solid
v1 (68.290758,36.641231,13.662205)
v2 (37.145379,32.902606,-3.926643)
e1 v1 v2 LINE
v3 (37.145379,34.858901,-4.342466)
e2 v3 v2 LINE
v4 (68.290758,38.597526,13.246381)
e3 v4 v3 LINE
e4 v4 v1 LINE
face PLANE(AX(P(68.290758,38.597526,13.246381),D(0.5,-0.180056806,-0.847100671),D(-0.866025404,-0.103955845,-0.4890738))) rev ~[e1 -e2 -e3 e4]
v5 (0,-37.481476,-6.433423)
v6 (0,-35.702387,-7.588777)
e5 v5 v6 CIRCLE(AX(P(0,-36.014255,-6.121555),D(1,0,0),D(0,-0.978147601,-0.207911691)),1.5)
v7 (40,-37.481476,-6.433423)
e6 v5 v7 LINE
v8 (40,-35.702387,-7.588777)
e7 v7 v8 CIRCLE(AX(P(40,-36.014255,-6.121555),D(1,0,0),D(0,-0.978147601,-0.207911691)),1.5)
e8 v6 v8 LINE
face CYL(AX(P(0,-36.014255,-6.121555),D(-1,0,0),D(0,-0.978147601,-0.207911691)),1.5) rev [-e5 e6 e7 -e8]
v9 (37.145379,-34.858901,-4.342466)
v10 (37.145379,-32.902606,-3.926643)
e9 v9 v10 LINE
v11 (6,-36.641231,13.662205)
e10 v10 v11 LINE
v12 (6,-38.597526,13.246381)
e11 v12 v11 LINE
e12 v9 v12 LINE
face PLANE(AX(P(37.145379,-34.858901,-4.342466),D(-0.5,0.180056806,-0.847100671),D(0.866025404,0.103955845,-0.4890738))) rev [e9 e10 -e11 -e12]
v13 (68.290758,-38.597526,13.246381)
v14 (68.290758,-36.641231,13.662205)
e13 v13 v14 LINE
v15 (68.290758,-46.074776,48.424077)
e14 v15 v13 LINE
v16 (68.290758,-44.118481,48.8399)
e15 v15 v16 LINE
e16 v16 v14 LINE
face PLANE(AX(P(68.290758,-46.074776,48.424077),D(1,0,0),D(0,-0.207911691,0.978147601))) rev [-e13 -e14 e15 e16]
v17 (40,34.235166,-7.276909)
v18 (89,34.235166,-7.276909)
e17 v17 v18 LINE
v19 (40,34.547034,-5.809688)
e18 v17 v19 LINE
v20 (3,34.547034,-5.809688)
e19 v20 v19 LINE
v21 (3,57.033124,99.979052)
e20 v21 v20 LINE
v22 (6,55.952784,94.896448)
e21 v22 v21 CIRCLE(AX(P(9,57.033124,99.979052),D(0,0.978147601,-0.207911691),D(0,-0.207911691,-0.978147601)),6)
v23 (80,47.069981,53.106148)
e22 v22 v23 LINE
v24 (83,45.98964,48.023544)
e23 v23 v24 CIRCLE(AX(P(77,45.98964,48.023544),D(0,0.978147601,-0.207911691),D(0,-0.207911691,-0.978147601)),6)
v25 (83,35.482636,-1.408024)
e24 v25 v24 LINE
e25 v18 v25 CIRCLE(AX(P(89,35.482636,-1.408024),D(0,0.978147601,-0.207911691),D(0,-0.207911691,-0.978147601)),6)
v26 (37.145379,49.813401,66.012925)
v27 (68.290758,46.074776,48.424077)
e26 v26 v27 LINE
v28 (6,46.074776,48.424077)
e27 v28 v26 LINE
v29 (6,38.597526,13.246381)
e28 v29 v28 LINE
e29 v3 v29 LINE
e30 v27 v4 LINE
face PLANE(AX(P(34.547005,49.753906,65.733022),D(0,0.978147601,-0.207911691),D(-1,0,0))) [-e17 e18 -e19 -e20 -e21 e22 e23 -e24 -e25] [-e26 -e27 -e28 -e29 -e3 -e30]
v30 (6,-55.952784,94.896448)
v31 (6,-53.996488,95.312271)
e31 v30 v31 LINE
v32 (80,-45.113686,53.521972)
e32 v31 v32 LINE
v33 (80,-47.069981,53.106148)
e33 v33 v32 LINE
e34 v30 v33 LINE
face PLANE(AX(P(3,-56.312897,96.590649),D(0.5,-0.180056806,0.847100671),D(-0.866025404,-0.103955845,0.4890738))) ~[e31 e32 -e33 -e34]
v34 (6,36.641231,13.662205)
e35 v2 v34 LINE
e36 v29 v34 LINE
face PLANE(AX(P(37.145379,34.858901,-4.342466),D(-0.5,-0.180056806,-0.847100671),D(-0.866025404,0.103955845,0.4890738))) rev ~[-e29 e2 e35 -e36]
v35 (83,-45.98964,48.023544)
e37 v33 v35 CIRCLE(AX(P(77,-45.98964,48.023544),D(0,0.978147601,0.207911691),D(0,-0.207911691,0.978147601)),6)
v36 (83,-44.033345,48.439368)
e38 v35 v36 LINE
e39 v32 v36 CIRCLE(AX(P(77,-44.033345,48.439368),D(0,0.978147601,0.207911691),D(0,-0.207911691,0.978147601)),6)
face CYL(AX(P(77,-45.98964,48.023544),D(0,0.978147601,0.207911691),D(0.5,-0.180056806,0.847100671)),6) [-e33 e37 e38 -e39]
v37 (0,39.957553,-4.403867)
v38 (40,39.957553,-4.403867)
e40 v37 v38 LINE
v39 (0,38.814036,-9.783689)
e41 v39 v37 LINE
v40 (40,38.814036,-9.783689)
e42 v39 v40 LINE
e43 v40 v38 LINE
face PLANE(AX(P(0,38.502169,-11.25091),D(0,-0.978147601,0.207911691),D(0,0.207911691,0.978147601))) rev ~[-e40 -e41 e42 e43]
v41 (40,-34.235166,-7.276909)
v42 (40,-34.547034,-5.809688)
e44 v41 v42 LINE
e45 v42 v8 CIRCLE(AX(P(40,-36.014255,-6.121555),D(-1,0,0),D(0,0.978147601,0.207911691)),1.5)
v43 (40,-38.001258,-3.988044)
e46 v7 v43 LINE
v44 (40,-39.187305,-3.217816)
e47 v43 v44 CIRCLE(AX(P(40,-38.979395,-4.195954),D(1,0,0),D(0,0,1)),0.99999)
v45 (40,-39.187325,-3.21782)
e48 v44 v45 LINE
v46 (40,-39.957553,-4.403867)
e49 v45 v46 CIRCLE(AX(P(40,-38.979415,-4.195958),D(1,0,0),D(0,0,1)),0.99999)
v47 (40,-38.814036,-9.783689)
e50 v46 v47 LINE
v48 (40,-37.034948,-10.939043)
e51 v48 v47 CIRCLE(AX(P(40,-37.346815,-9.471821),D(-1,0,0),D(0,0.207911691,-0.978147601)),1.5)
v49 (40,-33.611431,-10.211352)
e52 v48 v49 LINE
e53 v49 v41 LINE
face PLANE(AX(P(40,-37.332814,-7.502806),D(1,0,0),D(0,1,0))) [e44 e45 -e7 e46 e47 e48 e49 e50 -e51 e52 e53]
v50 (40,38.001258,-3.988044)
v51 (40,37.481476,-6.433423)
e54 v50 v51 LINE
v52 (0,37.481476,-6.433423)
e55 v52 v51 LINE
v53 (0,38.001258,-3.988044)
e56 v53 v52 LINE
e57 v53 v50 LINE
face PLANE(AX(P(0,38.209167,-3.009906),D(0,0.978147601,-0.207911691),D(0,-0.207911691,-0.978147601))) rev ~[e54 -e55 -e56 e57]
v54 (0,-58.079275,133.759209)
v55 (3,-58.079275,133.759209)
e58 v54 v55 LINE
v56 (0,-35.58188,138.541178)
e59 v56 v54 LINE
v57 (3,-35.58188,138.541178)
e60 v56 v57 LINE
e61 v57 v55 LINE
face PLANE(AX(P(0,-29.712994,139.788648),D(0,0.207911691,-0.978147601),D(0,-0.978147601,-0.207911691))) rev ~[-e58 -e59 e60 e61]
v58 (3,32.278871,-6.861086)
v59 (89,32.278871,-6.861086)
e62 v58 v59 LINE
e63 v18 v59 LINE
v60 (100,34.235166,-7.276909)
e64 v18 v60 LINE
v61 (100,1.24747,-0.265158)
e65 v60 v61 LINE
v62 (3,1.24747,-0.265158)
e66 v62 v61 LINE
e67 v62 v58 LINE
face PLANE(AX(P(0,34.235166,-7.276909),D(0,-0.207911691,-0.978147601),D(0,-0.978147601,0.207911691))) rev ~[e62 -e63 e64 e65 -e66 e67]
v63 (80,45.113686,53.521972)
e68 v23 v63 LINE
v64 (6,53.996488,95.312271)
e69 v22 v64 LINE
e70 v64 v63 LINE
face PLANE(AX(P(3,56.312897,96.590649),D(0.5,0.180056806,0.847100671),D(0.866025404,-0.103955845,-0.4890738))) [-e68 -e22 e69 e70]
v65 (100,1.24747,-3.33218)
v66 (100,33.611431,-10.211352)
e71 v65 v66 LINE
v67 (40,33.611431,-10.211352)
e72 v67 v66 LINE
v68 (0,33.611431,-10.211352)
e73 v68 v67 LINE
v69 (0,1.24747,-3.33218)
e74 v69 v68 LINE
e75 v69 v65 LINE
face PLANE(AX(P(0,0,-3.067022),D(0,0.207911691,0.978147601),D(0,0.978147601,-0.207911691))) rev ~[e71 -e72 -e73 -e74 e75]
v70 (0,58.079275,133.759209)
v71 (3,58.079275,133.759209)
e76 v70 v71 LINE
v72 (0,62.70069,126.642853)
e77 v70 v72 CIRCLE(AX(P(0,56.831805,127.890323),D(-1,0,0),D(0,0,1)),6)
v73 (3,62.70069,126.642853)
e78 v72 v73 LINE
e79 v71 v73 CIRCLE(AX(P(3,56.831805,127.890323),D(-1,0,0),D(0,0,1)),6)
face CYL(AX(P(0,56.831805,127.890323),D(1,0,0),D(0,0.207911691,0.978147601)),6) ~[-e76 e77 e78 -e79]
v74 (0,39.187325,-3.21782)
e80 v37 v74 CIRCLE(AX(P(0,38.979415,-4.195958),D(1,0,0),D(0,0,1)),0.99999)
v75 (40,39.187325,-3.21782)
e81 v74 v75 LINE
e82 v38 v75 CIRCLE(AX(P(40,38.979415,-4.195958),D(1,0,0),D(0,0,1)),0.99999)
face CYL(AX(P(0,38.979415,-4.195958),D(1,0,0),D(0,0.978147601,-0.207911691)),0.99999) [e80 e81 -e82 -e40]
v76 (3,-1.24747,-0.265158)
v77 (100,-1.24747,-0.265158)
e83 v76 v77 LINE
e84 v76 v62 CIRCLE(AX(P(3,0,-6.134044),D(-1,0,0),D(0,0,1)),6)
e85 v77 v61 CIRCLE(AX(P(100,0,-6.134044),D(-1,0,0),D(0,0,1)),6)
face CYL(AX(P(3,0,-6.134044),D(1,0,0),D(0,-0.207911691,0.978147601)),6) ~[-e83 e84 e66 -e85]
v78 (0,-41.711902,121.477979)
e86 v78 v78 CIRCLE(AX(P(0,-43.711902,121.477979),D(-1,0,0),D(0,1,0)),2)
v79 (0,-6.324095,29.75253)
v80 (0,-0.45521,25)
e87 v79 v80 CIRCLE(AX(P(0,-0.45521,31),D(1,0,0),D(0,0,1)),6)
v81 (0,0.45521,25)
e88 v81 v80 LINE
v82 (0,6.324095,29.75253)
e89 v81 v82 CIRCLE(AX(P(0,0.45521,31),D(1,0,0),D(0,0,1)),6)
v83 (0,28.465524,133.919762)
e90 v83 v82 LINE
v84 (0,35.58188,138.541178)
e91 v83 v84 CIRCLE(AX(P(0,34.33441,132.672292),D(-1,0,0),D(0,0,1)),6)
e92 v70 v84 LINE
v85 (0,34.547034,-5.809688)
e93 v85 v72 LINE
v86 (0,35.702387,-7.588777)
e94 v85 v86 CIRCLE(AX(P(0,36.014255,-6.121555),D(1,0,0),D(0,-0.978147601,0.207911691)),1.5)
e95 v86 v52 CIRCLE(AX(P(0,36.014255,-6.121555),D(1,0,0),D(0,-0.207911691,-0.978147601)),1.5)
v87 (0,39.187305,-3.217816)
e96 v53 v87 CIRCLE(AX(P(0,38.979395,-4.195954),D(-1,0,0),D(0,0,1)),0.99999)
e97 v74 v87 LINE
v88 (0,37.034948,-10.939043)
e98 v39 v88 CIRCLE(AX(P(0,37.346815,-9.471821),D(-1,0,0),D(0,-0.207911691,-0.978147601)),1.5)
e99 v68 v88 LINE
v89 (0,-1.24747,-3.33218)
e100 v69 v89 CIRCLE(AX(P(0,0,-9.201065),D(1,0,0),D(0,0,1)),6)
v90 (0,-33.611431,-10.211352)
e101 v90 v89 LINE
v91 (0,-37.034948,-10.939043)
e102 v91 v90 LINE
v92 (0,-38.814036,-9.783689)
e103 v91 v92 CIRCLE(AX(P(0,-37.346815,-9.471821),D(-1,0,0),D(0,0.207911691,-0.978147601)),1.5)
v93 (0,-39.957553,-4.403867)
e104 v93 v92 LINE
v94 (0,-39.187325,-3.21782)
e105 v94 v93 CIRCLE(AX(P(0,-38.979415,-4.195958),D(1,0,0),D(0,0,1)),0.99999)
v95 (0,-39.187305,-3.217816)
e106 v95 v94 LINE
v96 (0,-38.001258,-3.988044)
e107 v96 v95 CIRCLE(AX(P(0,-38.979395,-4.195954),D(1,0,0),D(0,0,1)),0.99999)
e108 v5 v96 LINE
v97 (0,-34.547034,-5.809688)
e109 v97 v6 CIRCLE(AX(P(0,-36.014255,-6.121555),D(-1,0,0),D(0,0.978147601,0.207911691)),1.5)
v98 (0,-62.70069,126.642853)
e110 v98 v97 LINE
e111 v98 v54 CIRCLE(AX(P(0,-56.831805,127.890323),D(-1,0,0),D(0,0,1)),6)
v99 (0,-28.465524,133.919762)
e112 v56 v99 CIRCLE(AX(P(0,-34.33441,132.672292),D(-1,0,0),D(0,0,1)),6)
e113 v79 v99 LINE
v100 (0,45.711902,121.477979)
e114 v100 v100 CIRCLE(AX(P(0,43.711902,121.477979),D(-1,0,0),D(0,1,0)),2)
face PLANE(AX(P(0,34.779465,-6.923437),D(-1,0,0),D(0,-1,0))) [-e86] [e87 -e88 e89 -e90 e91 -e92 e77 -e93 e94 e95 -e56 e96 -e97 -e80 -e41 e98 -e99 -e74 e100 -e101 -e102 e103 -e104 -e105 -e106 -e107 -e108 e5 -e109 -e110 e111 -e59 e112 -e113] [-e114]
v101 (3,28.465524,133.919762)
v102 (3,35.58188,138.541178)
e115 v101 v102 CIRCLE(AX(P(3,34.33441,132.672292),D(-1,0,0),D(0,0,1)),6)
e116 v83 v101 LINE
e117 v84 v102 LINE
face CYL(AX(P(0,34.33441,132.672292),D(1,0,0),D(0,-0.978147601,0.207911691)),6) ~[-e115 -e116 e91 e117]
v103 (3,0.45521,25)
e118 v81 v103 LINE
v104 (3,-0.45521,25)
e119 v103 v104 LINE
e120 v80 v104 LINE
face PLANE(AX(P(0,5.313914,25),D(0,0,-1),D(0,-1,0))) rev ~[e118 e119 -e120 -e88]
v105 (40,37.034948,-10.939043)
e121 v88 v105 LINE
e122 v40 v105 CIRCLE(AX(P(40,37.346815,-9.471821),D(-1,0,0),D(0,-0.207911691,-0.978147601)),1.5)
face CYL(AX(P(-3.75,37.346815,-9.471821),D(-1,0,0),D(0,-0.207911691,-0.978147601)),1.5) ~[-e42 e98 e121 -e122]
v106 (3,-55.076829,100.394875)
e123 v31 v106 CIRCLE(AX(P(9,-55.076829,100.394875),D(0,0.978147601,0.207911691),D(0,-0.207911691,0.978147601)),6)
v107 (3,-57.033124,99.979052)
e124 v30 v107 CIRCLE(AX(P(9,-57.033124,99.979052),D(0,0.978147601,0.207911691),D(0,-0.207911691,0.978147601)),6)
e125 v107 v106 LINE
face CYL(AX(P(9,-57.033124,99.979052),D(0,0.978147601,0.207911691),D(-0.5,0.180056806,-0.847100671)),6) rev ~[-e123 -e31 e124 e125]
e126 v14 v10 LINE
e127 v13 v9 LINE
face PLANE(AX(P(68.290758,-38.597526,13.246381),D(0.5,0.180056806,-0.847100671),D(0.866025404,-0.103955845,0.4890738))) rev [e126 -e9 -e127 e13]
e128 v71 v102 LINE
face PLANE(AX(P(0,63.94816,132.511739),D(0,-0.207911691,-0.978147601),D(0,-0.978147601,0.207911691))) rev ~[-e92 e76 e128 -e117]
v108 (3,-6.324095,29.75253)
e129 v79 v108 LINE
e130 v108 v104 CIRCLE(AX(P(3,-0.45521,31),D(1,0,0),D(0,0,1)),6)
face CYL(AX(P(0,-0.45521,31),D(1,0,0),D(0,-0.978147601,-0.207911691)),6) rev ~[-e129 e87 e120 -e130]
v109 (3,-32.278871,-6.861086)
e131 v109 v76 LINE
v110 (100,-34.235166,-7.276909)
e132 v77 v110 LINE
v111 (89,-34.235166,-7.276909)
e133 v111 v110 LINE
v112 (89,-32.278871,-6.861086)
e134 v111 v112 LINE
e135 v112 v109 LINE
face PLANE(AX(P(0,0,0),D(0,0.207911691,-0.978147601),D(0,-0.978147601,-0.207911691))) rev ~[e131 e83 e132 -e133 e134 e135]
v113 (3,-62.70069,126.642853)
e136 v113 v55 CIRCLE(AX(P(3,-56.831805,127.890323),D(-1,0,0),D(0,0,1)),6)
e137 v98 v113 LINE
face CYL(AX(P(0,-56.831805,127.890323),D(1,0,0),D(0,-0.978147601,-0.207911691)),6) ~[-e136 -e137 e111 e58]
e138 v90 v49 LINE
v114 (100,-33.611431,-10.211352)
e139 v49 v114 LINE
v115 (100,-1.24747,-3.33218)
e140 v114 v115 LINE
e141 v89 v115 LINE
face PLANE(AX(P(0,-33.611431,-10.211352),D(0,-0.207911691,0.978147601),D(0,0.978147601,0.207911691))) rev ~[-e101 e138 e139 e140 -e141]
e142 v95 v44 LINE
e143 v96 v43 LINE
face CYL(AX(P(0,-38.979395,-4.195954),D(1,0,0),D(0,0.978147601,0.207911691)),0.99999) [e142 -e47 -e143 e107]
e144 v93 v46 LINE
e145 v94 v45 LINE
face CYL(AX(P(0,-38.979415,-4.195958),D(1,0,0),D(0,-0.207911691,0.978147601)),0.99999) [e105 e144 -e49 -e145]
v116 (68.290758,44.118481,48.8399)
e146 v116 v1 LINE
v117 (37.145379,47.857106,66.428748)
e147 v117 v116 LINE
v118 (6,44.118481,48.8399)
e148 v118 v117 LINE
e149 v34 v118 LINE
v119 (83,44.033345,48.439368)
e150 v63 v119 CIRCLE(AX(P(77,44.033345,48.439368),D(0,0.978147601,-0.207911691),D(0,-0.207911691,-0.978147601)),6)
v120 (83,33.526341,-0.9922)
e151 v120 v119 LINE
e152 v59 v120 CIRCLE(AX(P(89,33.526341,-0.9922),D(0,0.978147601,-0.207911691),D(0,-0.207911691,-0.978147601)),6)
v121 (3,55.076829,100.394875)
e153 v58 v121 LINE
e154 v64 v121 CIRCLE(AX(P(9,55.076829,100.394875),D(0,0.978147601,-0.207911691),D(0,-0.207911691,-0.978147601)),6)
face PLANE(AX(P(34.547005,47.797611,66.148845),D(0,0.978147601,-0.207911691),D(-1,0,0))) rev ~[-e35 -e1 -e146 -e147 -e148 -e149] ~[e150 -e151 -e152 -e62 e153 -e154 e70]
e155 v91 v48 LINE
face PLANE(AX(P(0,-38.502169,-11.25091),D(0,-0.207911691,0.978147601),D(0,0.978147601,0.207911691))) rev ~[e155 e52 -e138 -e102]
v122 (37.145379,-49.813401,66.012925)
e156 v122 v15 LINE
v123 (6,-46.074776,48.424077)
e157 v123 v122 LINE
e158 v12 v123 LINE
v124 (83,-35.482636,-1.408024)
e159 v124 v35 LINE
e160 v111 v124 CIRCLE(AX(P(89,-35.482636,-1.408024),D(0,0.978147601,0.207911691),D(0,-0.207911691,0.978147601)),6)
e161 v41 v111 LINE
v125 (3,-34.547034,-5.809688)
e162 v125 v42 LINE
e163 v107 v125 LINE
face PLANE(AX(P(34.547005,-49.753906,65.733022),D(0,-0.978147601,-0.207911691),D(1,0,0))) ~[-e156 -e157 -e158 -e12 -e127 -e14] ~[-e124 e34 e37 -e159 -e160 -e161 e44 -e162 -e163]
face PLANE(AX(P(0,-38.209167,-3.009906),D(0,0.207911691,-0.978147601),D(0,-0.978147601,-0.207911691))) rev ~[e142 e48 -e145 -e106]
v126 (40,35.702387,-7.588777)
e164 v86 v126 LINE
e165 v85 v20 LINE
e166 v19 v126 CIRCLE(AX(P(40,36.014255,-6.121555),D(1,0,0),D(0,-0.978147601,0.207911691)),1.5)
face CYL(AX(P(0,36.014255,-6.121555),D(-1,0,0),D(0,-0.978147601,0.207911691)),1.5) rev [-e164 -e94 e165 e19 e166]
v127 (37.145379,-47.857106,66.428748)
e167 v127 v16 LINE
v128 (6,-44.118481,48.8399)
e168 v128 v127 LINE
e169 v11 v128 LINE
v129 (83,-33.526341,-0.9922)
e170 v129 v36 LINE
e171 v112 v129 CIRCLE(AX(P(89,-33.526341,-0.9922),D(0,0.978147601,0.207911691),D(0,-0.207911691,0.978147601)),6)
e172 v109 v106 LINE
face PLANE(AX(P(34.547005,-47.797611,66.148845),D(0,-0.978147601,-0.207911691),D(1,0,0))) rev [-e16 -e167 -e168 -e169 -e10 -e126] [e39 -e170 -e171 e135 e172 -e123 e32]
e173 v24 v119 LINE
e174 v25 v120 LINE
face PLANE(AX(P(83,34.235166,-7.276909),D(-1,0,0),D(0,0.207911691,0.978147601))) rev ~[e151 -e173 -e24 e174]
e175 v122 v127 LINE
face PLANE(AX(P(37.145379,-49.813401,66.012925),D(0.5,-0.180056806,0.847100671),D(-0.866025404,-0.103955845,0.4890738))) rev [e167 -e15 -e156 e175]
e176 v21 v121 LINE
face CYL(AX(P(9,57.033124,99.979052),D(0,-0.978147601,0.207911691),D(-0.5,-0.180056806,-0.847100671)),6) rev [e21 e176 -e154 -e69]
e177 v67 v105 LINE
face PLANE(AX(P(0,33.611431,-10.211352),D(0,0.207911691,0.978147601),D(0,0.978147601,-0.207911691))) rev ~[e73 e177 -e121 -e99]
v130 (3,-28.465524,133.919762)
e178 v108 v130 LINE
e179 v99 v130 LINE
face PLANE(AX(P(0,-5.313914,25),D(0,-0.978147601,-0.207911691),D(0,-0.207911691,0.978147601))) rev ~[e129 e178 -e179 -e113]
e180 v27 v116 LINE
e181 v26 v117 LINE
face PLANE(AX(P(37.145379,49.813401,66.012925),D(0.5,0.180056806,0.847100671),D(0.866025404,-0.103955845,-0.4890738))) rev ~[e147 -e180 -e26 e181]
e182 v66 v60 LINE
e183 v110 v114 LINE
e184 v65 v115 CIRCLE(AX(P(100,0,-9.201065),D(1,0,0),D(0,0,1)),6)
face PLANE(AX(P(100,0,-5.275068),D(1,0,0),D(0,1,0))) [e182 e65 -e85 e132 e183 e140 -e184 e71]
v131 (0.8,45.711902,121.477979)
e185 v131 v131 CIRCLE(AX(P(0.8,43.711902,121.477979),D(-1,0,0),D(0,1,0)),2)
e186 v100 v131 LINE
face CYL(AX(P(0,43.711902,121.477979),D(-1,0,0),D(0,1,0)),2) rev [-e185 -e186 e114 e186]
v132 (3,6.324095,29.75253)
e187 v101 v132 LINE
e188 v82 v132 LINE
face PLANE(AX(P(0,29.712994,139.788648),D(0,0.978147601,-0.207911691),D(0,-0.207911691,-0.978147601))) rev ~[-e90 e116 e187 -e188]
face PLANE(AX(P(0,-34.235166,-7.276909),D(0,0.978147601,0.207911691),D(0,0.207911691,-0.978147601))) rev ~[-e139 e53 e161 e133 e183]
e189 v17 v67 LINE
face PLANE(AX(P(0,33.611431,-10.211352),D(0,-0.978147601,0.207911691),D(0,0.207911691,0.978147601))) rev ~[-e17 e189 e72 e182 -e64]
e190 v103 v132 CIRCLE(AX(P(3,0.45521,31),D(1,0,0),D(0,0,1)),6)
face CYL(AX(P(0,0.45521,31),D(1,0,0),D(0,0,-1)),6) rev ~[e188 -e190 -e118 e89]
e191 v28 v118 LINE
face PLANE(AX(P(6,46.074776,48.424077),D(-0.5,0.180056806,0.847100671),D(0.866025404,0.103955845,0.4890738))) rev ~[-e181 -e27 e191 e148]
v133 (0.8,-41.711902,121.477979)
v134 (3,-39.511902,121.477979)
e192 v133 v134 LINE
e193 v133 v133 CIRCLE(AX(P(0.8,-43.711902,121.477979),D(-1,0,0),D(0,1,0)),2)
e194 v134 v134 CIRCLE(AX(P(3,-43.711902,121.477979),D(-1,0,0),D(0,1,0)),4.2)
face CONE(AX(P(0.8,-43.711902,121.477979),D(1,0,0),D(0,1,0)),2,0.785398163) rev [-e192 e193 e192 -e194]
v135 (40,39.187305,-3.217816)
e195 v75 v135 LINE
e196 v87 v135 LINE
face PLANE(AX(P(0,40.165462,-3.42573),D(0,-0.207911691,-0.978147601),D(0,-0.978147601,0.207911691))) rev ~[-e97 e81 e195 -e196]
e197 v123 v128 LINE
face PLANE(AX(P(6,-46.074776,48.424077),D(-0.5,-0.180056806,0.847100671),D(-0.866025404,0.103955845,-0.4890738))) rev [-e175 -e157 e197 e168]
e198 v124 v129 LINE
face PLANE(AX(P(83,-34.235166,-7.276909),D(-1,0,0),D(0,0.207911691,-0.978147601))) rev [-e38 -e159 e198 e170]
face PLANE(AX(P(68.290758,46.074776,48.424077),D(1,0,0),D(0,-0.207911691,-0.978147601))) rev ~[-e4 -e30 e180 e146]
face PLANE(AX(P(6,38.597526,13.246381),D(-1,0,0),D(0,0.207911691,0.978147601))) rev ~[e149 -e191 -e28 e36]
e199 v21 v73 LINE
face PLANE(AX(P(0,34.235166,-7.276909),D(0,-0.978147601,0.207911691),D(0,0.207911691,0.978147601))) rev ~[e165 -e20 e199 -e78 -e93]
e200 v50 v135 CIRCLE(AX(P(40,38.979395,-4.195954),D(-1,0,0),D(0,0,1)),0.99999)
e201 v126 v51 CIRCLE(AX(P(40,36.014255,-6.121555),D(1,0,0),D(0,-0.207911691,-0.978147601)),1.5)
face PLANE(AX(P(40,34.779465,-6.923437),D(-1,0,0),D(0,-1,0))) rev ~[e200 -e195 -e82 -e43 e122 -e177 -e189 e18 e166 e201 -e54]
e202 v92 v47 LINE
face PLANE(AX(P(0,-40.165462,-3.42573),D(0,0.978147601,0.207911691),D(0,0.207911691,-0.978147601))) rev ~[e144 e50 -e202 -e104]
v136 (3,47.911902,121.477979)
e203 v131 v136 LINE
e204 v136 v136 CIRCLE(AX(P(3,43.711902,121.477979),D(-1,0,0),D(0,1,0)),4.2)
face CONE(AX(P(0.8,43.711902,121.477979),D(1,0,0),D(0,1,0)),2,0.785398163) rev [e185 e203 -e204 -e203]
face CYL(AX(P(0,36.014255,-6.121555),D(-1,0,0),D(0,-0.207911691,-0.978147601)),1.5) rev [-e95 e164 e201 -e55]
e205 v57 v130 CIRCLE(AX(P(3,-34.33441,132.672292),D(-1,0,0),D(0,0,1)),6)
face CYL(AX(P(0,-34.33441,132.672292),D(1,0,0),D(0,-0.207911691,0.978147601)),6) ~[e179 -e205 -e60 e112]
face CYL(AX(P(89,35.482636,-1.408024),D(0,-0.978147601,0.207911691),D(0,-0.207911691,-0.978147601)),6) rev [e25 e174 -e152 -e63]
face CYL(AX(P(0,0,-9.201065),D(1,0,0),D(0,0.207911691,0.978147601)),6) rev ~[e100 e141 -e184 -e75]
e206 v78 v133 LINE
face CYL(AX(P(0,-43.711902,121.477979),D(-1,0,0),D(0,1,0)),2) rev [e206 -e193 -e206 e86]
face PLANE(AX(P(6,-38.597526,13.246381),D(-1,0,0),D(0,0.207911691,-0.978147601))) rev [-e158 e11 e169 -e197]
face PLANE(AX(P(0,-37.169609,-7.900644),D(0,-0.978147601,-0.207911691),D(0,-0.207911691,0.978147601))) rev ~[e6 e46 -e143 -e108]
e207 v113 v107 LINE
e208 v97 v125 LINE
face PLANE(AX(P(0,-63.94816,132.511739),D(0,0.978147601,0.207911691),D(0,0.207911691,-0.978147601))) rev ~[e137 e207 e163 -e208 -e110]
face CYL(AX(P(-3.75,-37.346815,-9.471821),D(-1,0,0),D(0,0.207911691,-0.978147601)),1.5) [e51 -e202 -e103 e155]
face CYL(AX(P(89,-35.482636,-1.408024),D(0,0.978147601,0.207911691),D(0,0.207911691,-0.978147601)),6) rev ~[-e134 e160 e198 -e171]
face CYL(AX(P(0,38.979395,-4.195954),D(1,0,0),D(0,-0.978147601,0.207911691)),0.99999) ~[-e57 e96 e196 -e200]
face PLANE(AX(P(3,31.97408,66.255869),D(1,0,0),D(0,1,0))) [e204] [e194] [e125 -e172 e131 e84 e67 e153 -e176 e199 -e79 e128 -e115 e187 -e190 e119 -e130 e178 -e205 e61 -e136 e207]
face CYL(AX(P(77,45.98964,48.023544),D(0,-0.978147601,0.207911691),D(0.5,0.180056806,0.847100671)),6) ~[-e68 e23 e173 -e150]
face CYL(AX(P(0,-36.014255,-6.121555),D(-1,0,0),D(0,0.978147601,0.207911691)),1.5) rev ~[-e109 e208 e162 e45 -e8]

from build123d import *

# Parameters (mm, degrees)
F1_DEPTH     = 100
F0_R         = 2
F2_DEPTH     = 3
F3_DEPTH     = 40
F4_W         = 80
F4_H         = 60
F5_DEPTH     = 2
F7_DEPTH     = 25
F9_R         = 6
F10_T1_DEPTH = 40
F10_T3_DEPTH = 47.5
F11_R        = 0.99999
F12_SIZE     = 2.2


# Not quite as in the source:
# - a fillet or chamfer that OpenCascade refuses, or shapes differently, is made with other operations: its cross-section is extruded or revolved along the edge and cut away or added
# - a fillet or chamfer is up to 0.001 mm smaller than in the source, because OpenCascade refuses the exact size


with BuildPart() as f1:
    # F0 (on Right) → F1 (new body)
    with BuildSketch(Plane.YZ):
        Polygon((34.2351660257, -7.2769091786), (0, 0), (-34.2351660257, -7.2769091786), (-33.6114309532, -10.2113519808), (0, -3.0670217846), (33.6114309532, -10.2113519808), align=None)
    extrude(amount=F1_DEPTH)

    # F0 (on Right) → F2 (join)
    with BuildSketch(Plane.YZ):
        Polygon((5.3139140418, 25), (0, 0), (34.2351660257, -7.2769091786), (63.9481604091, 132.5117388406), (29.7129943835, 139.7886480192), align=None)
        with Locations((43.711902034, 121.4779794189)):
            Circle(F0_R, mode=Mode.SUBTRACT)
        Polygon((-5.3139140418, 25), (0, 0), (5.3139140418, 25), align=None)
        Polygon((-34.2351660257, -7.2769091786), (0, 0), (-5.3139140418, 25), (-29.7129943835, 139.7886480192), (-63.9481604091, 132.5117388406), align=None)
        with Locations((-43.711902034, 121.4779794189)):
            Circle(F0_R, mode=Mode.SUBTRACT)
    extrude(amount=F2_DEPTH)

    # F0 (on Right) → F3 (join)
    with BuildSketch(Plane.YZ):
        Polygon((-33.6114309532, -10.2113519808), (-34.2351660257, -7.2769091786), (-37.1696088279, -7.9006442511), (-38.209167282, -3.0099062474), (-40.1654624834, -3.425729629), (-38.5021689569, -11.2509104349), align=None)
        Polygon((37.1696088279, -7.9006442511), (34.2351660257, -7.2769091786), (33.6114309532, -10.2113519808), (38.5021689569, -11.2509104349), (40.1654624834, -3.425729629), (38.209167282, -3.0099062474), align=None)
    extrude(amount=F3_DEPTH)

    # F4 (on face) → F5 (join)
    with BuildSketch(Plane(origin=(0, 34.2351660257, -7.2769091786), x_dir=(-1, 0, 0), z_dir=(0, 0.9781476007, -0.2079116908))):
        Polygon((-3, 106.1880215352), (-83, 60), (-3, 60), align=None)
        with Locations((-43, 30)):
            Rectangle(F4_W, F4_H)
    extrude(amount=-F5_DEPTH)

    # F6 (on face) → F7 (cut)
    with BuildSketch(Plane(origin=(0, 34.2351660257, -7.2769091786), x_dir=(-1, 0, 0), z_dir=(0, 0.9781476007, -0.2079116908))):
        Polygon((-68.2907584126, 20.9817930688), (-37.1453792063, 3), (-6, 20.9817930688), (-6, 56.9453792063), (-37.1453792063, 74.927172275), (-68.2907584126, 56.9453792063), align=None)
    extrude(amount=-F7_DEPTH, mode=Mode.SUBTRACT)

    # F8: F1 across plane


with BuildPart() as f1_1:
    add(f1.part)
    add(f1.part.mirror(Plane.XZ))

    # F9
    f9_edges = [f1_1.edges().sort_by_distance(p)[0] for p in [
        (3, -55.33475, 96.798561),
        (3, 55.33475, 96.798561),
        (83, -45.73172, 51.619859),
        (83, 45.73172, 51.619859),
        (83, -33.257018, -7.068997),
        (83, 33.257018, -7.068997),
        (1.5, -5.313914, 25),
        (1.5, 5.313914, 25),
        (51.5, 0, 0),
        (50, 0, -3.067022),
        (1.5, -29.712994, 139.788648),
        (1.5, -63.94816, 132.511739),
        (1.5, 29.712994, 139.788648),
        (1.5, 63.94816, 132.511739),
    ]]
    fillet(f9_edges, radius=F9_R)

    # F10: fillet of radius 1.5 on 6 edges, made by hand

    # F10_s2 → F10_t1 (join)
    with BuildSketch(Plane.YZ):
        with BuildLine():
            ThreePointArc((34.5470335619, -5.8096877775), (34.7562491111, -6.9385138663), (35.7023874268, -7.5887767148))
            Line((35.7023874268, -7.5887767148), (34.2351660257, -7.2769091786))
            Line((34.2351660257, -7.2769091786), (34.5470335619, -5.8096877775))
        make_face()
        with BuildLine():
            ThreePointArc((35.7023874268, -7.5887767148), (36.8312135155, -7.3795611657), (37.4814763641, -6.43342285))
            Line((37.4814763641, -6.43342285), (37.1696088279, -7.9006442511))
            Line((37.1696088279, -7.9006442511), (35.7023874268, -7.5887767148))
        make_face()
        with BuildLine():
            ThreePointArc((-37.4814763641, -6.43342285), (-36.8312135155, -7.3795611657), (-35.7023874268, -7.5887767148))
            Line((-35.7023874268, -7.5887767148), (-37.1696088279, -7.9006442511))
            Line((-37.1696088279, -7.9006442511), (-37.4814763641, -6.43342285))
        make_face()
        with BuildLine():
            ThreePointArc((-34.5470335619, -5.8096877775), (-34.7562491111, -6.9385138663), (-35.7023874268, -7.5887767148))
            Line((-35.7023874268, -7.5887767148), (-34.2351660257, -7.2769091786))
            Line((-34.2351660257, -7.2769091786), (-34.5470335619, -5.8096877775))
        make_face()
    extrude(amount=F10_T1_DEPTH)

    # F10_s4 → F10_t3 (cut)
    with BuildSketch(Plane.YZ.offset(-3.75)):
        with BuildLine():
            ThreePointArc((-37.0349475558, -10.9390428987), (-38.1637736445, -10.7298273495), (-38.8140364931, -9.7836890338))
            Line((-38.8140364931, -9.7836890338), (-38.5021689569, -11.2509104349))
            Line((-38.5021689569, -11.2509104349), (-37.0349475558, -10.9390428987))
        make_face()
        with BuildLine():
            ThreePointArc((37.0349475558, -10.9390428987), (38.1637736445, -10.7298273495), (38.8140364931, -9.7836890338))
            Line((38.8140364931, -9.7836890338), (38.5021689569, -11.2509104349))
            Line((38.5021689569, -11.2509104349), (37.0349475558, -10.9390428987))
        make_face()
    extrude(amount=F10_T3_DEPTH, mode=Mode.SUBTRACT)

    # F11 (radius 1 in the source; OpenCascade refuses exactly that, so slightly less here)
    f11_edges = [f1_1.edges().sort_by_distance(p)[0] for p in [
        (20, 40.165462, -3.42573),
        (20, 38.209167, -3.009906),
        (20, -40.165462, -3.42573),
        (20, -38.209167, -3.009906),
    ]]
    fillet(f11_edges, radius=F11_R)

    # F12
    f12_edges = [f1_1.edges().sort_by_distance(p)[0] for p in [
        (3, -45.711902, 121.477979),
        (3, 41.711902, 121.477979),
    ]]
    chamfer(f12_edges, length=F12_SIZE)


solid = f1_1.part
